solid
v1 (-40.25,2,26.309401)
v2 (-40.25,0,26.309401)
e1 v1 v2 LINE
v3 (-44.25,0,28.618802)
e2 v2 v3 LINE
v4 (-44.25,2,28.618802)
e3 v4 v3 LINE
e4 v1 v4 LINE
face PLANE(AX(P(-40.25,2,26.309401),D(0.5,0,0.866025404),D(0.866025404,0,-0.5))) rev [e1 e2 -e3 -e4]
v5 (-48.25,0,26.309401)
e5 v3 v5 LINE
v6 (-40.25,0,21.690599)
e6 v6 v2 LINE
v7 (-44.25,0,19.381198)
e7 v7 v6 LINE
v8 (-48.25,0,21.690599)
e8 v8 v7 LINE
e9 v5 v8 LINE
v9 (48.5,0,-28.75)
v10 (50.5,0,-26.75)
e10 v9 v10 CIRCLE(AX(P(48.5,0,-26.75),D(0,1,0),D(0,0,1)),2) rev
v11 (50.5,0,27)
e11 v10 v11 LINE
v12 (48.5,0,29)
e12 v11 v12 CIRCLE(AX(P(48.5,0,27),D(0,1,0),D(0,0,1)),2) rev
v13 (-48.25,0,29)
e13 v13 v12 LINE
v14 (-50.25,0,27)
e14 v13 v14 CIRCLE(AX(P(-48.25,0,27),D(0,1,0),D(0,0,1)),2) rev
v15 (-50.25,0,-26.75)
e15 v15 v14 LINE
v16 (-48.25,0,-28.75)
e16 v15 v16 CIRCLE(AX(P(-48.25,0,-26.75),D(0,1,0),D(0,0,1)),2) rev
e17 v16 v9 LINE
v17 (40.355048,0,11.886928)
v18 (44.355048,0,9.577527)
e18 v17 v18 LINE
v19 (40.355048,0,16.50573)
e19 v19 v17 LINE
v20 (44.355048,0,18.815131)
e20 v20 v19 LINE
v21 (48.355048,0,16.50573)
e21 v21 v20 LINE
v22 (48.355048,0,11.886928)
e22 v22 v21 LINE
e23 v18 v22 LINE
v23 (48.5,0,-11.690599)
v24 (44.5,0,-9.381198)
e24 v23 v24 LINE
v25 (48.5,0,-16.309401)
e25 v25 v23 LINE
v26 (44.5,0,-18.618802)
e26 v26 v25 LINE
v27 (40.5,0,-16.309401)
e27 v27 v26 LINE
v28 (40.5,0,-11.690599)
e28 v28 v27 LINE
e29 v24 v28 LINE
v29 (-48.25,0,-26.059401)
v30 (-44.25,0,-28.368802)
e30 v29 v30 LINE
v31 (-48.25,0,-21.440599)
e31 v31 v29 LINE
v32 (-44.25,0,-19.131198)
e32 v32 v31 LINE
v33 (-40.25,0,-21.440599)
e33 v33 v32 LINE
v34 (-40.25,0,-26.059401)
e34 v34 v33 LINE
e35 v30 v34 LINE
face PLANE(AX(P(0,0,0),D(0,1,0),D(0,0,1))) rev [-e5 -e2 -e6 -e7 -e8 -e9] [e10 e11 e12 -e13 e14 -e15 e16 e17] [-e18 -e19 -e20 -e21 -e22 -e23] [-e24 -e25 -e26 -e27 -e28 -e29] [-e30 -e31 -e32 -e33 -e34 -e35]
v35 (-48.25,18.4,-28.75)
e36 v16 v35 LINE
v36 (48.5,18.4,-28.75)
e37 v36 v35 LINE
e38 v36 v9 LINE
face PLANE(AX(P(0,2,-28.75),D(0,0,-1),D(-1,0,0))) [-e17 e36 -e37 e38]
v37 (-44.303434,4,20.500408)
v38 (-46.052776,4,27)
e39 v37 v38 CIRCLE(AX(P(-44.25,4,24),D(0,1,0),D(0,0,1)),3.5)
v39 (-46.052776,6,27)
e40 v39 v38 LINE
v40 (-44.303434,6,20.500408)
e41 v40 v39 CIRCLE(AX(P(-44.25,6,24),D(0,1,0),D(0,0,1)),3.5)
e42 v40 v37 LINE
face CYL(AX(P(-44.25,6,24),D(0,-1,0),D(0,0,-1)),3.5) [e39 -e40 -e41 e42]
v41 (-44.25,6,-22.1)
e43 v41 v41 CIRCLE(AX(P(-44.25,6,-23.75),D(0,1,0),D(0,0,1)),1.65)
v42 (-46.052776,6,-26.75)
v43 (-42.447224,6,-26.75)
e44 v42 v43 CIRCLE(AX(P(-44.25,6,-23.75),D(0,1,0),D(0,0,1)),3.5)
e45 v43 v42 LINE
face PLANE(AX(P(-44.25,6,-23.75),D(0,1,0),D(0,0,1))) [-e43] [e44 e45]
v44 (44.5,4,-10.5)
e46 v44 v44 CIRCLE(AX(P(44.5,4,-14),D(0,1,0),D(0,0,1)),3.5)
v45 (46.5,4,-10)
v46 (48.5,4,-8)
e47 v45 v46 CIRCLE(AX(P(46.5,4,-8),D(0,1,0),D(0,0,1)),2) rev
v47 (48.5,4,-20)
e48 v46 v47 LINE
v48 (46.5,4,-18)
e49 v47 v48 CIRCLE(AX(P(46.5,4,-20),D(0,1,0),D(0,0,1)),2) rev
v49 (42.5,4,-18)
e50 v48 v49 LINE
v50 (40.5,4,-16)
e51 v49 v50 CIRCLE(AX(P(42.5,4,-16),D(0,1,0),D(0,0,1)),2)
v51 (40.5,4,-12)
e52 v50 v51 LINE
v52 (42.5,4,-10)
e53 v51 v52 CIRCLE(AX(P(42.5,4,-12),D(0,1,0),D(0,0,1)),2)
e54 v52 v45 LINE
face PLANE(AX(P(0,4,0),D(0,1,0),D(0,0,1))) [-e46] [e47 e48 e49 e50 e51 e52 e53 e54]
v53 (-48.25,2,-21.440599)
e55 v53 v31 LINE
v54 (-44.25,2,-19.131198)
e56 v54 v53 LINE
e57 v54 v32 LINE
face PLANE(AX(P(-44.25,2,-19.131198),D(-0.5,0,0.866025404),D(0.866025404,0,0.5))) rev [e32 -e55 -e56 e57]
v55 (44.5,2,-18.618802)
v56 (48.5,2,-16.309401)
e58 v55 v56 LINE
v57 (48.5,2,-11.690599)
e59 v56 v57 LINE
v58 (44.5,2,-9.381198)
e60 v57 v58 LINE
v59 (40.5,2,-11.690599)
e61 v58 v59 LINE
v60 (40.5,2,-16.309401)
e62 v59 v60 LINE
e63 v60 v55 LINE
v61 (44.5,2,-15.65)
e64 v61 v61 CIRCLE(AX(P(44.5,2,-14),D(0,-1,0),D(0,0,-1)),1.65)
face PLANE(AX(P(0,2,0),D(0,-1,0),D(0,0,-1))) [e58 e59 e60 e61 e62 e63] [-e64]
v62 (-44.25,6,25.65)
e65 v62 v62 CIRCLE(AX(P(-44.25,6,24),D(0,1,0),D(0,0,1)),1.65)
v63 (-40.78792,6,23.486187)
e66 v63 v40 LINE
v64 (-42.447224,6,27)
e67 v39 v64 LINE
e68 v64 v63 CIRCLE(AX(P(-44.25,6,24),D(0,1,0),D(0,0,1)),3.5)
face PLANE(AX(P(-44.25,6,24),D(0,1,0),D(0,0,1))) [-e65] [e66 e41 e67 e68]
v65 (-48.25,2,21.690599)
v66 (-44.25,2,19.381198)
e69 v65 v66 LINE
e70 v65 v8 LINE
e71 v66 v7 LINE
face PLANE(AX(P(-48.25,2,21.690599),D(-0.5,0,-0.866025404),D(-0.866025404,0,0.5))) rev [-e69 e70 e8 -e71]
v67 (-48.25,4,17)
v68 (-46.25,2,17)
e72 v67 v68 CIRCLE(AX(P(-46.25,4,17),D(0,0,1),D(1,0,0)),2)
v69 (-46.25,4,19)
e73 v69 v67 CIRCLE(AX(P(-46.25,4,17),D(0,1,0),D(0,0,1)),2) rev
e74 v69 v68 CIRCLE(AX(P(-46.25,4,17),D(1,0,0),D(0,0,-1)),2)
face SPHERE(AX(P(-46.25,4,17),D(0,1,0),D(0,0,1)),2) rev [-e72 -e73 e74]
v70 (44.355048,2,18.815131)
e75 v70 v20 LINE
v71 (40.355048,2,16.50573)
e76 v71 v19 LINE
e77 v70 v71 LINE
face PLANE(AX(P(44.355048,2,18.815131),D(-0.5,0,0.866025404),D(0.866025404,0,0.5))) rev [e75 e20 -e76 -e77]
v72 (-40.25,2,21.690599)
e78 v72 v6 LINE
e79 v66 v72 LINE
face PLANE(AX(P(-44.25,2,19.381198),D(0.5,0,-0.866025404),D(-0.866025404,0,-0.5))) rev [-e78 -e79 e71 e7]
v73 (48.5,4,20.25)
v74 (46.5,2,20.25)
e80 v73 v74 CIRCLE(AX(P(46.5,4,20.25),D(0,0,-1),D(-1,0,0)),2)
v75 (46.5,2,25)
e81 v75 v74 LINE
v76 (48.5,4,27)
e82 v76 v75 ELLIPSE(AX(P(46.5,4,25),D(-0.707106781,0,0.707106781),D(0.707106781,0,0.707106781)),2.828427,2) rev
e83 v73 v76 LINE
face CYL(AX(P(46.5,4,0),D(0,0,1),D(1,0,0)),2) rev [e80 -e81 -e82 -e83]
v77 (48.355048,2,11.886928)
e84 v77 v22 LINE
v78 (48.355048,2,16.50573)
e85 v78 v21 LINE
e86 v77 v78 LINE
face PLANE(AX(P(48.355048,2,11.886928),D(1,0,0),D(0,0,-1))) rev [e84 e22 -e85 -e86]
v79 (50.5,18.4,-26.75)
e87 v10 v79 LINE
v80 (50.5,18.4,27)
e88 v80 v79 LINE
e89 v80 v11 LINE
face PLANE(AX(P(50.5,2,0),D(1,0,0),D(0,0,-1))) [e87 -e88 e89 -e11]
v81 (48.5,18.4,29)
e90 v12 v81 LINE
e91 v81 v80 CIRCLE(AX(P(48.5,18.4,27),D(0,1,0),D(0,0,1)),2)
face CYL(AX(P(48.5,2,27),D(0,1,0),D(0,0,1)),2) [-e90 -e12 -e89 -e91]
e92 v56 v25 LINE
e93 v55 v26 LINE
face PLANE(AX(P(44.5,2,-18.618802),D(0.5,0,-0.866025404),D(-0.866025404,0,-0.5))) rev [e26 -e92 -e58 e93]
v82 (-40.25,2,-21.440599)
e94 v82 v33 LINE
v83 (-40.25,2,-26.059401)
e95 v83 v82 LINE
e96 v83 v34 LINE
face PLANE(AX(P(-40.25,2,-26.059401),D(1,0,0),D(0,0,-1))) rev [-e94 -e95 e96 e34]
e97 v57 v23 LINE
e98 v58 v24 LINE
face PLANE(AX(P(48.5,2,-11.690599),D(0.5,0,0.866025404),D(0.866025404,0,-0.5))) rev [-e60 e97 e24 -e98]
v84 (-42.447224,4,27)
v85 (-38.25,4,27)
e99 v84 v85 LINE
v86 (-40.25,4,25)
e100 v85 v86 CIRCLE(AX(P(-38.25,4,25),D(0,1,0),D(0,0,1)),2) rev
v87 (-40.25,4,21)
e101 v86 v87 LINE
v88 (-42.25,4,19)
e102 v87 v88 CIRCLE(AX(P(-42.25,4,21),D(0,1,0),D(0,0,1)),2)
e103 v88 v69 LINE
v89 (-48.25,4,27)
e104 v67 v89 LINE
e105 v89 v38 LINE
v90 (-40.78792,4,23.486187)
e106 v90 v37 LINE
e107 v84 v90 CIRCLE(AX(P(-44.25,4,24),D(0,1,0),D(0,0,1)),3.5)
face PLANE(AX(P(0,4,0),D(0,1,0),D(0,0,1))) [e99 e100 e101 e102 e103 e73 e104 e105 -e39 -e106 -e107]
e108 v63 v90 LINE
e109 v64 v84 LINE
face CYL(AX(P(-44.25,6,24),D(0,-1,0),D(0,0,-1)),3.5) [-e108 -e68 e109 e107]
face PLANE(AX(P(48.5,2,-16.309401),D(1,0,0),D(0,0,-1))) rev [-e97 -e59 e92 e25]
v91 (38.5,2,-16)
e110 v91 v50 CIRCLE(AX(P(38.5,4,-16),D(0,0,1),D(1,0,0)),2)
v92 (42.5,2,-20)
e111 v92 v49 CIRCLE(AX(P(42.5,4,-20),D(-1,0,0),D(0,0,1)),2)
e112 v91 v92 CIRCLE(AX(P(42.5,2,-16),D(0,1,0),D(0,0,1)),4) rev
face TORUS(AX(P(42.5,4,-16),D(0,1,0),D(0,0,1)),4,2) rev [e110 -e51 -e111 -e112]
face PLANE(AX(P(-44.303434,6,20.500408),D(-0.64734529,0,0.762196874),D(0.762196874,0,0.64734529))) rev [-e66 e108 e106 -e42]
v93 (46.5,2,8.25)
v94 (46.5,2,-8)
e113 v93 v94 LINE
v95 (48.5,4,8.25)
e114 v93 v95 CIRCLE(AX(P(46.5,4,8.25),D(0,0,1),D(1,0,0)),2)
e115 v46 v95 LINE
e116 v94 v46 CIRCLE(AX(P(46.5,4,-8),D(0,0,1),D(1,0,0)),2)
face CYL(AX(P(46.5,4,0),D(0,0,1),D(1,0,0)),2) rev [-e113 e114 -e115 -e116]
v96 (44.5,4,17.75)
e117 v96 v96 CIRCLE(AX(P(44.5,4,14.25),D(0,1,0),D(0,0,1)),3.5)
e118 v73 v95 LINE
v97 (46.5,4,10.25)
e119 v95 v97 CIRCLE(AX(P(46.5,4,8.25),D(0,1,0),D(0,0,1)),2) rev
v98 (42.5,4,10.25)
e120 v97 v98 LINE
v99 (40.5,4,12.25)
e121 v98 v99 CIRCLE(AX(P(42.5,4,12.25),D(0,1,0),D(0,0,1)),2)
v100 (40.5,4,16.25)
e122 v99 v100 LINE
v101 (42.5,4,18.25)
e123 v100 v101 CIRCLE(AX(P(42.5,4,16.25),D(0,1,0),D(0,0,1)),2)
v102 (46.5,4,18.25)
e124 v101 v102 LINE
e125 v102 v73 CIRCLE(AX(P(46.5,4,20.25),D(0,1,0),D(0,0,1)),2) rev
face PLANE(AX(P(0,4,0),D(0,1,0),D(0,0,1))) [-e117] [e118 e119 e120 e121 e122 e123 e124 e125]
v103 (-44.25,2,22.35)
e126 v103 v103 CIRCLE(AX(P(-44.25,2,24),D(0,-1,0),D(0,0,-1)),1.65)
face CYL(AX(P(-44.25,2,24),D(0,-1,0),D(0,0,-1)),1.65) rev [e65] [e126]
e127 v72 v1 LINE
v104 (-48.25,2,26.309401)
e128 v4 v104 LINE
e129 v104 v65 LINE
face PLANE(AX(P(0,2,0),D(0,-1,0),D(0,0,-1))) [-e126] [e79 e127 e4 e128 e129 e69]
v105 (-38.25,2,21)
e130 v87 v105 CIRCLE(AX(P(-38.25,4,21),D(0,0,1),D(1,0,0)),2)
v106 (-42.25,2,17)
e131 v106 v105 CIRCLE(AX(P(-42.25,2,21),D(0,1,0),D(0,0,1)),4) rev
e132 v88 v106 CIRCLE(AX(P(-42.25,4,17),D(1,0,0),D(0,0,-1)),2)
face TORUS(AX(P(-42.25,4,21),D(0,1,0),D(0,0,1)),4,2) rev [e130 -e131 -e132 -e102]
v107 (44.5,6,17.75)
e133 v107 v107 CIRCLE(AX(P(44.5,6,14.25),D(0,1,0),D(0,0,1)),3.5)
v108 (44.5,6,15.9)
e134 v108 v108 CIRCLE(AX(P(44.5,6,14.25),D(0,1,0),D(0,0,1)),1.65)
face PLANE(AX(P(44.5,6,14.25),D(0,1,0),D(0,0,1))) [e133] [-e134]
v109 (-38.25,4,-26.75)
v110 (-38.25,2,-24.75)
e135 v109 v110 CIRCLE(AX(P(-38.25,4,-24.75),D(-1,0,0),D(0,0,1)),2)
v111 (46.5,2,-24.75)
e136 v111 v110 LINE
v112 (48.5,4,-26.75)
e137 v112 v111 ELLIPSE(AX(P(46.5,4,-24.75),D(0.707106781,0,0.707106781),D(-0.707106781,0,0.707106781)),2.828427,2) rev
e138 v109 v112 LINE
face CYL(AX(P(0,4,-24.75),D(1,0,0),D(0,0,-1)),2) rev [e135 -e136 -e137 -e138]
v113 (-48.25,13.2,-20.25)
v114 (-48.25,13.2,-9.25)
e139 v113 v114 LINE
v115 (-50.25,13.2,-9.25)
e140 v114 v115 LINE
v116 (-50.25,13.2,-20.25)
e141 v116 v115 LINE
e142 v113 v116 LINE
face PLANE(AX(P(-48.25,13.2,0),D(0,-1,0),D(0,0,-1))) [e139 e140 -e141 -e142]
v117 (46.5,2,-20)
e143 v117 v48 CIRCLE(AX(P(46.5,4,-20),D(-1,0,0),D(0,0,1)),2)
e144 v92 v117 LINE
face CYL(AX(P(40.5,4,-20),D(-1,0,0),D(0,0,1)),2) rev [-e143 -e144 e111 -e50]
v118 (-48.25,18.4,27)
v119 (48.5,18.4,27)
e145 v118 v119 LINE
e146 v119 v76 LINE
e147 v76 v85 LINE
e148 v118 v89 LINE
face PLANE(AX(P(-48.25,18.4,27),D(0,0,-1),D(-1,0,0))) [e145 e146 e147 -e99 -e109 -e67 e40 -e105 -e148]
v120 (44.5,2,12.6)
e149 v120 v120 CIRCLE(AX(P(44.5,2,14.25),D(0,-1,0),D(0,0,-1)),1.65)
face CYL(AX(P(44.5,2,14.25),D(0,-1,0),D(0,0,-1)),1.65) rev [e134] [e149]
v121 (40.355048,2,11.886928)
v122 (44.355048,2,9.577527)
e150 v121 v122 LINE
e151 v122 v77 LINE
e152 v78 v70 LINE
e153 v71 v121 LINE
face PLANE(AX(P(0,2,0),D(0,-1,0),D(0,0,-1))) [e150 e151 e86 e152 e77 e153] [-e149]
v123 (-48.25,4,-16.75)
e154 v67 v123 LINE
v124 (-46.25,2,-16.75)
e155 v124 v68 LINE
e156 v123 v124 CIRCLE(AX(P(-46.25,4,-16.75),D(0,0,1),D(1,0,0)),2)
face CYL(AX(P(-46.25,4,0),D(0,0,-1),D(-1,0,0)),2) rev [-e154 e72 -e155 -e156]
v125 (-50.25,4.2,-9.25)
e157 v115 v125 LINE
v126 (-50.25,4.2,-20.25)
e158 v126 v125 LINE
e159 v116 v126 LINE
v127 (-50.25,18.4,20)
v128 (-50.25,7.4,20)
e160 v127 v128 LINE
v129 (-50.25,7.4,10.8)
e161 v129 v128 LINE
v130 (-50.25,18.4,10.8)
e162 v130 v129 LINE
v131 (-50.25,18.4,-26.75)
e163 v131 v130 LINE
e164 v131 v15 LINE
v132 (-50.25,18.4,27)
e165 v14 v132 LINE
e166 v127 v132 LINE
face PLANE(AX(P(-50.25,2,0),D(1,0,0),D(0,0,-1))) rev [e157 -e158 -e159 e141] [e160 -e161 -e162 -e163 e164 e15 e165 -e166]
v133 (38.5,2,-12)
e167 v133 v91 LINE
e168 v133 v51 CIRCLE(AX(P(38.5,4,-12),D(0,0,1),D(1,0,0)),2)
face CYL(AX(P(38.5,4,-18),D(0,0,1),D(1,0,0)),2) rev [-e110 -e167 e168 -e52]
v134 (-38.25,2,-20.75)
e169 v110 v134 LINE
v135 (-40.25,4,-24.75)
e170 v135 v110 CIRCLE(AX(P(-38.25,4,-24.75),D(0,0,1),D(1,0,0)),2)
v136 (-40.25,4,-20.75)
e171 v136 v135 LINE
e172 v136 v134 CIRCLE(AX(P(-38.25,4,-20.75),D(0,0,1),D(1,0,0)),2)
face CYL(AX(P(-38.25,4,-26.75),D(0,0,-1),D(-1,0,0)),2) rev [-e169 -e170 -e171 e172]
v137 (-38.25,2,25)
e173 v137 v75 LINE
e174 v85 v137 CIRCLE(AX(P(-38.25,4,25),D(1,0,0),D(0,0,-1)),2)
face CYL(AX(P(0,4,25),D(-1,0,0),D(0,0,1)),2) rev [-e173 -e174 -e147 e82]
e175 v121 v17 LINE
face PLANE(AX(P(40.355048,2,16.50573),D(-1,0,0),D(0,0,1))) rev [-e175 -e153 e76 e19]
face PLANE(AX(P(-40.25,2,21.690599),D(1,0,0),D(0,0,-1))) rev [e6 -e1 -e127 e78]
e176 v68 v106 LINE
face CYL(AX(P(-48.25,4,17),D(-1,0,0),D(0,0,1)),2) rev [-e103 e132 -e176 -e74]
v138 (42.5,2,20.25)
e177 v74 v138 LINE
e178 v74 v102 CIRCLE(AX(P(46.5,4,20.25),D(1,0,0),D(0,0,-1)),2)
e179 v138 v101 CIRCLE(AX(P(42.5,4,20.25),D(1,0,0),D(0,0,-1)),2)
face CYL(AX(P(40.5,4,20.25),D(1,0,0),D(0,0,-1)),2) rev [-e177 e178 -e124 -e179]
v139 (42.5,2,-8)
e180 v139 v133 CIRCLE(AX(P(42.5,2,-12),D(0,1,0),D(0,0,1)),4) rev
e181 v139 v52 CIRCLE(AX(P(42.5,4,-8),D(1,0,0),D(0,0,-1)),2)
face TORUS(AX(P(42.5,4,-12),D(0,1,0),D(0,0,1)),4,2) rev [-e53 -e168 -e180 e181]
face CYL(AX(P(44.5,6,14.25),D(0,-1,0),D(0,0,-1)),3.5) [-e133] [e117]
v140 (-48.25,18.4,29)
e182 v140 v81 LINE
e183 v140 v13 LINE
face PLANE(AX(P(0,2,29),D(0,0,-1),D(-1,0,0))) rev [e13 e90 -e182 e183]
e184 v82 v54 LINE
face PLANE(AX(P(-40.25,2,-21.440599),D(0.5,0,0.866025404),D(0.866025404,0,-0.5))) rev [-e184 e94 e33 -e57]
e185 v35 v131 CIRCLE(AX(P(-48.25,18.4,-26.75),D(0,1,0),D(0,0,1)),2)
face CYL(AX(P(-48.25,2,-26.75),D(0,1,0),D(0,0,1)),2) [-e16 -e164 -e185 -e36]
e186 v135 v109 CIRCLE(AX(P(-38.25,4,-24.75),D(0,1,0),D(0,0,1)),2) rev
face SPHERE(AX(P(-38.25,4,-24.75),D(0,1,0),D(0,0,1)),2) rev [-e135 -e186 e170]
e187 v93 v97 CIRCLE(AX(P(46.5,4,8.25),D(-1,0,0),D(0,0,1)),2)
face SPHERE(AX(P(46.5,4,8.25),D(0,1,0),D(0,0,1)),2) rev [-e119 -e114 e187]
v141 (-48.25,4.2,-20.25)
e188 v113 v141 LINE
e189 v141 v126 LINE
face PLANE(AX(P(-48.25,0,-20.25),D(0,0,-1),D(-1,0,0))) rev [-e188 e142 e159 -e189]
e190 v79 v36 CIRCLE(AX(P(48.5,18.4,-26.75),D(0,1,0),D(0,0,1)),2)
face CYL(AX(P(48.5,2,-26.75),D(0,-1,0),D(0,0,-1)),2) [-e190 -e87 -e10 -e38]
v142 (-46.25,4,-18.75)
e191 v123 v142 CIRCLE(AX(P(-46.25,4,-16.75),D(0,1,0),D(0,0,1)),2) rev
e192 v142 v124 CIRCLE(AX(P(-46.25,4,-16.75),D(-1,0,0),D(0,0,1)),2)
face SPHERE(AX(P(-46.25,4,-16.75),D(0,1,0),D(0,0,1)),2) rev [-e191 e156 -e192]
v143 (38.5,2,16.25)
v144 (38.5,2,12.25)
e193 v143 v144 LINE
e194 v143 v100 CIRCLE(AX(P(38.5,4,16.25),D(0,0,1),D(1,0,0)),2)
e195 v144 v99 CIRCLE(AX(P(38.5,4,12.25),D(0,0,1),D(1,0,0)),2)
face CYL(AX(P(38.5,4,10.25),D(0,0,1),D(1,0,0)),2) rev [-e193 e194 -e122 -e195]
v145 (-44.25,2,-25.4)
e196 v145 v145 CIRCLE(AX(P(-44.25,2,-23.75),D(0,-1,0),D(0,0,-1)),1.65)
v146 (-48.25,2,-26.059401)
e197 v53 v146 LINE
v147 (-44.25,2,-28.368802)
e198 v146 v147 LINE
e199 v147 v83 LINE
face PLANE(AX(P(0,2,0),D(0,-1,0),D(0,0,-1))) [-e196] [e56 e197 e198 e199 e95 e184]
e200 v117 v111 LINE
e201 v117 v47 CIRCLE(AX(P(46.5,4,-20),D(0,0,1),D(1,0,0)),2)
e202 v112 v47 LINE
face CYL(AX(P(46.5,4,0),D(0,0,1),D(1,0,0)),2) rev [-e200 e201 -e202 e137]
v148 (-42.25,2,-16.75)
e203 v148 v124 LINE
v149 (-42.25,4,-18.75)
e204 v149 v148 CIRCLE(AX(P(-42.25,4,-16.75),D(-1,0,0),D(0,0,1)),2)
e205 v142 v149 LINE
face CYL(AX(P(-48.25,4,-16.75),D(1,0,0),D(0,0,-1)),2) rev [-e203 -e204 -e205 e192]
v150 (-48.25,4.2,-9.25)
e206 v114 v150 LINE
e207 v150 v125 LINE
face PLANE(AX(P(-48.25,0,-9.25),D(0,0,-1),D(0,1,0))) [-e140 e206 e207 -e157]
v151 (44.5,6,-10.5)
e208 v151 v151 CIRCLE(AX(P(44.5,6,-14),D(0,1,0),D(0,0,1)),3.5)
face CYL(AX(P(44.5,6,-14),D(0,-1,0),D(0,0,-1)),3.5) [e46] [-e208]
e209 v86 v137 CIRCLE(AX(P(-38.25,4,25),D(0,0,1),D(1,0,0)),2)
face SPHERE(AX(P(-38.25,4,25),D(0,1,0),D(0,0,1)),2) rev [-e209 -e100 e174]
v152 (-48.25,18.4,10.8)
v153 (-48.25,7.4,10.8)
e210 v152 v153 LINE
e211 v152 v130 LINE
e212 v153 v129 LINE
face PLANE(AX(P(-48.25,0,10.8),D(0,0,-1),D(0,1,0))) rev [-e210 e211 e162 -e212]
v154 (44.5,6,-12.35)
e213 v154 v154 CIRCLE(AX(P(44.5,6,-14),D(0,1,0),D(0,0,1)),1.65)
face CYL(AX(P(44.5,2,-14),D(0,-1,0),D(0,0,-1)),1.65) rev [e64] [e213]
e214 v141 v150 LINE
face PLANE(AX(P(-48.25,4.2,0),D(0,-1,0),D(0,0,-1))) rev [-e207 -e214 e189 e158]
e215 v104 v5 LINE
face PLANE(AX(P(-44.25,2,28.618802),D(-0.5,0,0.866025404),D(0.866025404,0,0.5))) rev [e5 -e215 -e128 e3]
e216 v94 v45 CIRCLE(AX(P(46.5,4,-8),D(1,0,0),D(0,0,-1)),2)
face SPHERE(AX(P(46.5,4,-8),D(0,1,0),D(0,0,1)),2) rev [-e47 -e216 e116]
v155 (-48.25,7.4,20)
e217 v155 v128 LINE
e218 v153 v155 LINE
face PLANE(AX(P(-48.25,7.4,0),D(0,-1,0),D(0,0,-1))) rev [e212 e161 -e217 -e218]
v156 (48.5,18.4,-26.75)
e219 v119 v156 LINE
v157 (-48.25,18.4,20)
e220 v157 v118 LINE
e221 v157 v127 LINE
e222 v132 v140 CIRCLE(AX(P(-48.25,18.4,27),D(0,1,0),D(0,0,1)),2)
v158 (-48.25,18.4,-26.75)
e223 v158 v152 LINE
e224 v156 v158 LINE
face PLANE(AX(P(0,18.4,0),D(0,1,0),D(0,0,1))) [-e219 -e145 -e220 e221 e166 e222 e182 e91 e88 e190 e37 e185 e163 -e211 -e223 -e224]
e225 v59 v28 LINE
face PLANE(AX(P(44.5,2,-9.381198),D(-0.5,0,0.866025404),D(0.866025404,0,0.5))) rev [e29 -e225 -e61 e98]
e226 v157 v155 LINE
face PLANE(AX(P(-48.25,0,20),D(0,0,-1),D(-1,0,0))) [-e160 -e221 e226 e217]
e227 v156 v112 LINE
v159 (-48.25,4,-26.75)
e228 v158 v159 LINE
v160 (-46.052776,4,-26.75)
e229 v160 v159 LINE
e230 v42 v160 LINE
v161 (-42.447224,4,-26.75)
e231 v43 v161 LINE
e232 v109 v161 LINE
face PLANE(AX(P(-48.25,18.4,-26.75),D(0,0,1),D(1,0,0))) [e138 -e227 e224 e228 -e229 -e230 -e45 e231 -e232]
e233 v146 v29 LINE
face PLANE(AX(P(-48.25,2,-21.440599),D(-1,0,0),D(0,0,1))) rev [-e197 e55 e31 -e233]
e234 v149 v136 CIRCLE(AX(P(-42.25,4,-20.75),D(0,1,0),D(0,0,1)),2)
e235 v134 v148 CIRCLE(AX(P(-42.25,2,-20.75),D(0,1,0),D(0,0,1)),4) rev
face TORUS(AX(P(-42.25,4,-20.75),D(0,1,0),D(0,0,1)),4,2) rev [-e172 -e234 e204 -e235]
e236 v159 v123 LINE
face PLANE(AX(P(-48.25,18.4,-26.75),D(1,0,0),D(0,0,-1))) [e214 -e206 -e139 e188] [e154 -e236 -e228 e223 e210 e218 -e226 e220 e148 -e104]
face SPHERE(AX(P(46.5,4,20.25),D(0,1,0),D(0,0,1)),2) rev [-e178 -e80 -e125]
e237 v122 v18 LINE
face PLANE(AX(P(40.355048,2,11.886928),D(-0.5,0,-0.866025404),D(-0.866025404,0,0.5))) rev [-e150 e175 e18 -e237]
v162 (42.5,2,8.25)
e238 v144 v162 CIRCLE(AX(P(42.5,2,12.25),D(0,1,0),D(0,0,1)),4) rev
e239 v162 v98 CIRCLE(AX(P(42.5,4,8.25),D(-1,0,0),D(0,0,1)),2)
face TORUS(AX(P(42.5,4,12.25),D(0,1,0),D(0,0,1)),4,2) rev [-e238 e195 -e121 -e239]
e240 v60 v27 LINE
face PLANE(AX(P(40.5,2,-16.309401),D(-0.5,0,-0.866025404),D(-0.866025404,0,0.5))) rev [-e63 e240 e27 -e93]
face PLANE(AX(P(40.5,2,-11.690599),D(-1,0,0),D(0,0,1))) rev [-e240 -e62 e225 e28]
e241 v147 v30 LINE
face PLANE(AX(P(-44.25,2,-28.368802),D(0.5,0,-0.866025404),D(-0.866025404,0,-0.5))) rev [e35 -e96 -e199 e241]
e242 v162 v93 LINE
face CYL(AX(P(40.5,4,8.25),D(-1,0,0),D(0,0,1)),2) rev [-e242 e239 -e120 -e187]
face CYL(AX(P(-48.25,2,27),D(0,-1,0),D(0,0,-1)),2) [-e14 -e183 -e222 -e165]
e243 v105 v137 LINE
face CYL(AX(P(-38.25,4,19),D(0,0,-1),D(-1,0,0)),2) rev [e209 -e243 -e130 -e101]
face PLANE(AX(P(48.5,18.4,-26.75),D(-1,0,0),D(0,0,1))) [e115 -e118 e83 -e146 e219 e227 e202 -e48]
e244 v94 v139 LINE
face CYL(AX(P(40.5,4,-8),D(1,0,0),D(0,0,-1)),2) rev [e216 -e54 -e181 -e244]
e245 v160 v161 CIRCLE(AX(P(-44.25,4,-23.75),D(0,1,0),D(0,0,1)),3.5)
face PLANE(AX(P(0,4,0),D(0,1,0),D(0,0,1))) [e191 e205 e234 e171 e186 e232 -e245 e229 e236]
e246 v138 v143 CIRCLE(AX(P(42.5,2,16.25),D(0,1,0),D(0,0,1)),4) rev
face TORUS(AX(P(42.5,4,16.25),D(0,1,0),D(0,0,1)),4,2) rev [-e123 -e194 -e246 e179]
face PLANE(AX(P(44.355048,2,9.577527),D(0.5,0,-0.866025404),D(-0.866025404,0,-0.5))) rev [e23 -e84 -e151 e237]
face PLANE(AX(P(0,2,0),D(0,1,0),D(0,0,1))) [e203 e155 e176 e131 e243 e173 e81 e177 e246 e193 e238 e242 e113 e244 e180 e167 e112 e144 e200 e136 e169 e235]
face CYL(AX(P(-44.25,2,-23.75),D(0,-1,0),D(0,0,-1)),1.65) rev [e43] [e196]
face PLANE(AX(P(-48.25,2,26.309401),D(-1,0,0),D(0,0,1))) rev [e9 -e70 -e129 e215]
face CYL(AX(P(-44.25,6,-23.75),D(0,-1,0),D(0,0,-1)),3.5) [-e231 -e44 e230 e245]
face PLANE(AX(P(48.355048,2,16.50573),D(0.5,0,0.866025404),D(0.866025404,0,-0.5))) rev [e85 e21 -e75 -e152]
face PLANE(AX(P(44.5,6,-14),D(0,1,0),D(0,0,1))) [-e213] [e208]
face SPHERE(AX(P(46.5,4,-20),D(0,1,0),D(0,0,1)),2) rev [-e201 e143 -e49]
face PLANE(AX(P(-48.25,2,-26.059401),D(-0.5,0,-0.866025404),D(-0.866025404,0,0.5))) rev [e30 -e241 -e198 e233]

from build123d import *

# Parameters (mm, degrees)
SKETCH1_W           = 100.75
SKETCH1_H           = 57.75
SKETCH1_W_2         = 96.75
SKETCH1_H_2         = 53.75
SKETCH1_R           = 1.65
BOSS_EXTRUDE1_DEPTH = 2
SKETCH2_R           = 3.5
SKETCH2_R_2         = 1.65
BOSS_EXTRUDE2_DEPTH = 4
SKETCH3_W           = 100.75
SKETCH3_H           = 57.75
SKETCH3_W_2         = 96.75
SKETCH3_H_2         = 53.75
BOSS_EXTRUDE3_DEPTH = 16.4
FILLET1_R           = 2
SKETCH5_W           = 8
SKETCH5_H           = 8
SKETCH5_R           = 1.65
BOSS_EXTRUDE4_DEPTH = 2
FILLET3_R           = 2
FILLET4_R           = 2
SKETCH6_W           = 9.2
SKETCH6_H           = 11
SKETCH6_W_2         = 8
SKETCH6_H_2         = 2.6
CUT_EXTRUDE2_DEPTH  = 2
CUT_EXTRUDE3_DEPTH  = 2


with BuildPart() as part:
    # Sketch1 → Boss-Extrude1 (new body)
    # profile 1 of 2: a face of its own
    with BuildSketch(Plane(origin=(0, 0, 0), x_dir=(1, 0, 0), z_dir=(0, 1, 0))):
        with Locations((0.125, -0.125)):
            Rectangle(SKETCH1_W, SKETCH1_H)
        with Locations((0.125, -0.125)):
            Rectangle(SKETCH1_W_2, SKETCH1_H_2, mode=Mode.SUBTRACT)
    # profile 2 of 2: a face of its own
    with BuildSketch(Plane(origin=(0, 0, 0), x_dir=(1, 0, 0), z_dir=(0, 1, 0))):
        with Locations((0.125, -0.125)):
            Rectangle(SKETCH1_W_2, SKETCH1_H_2)
        with Locations(Location((-44.25, -24, 0), (0, 0, 270))):
            Circle(SKETCH1_R, mode=Mode.SUBTRACT)
        with Locations(Location((-44.25, 23.75, 0), (0, 0, 270))):
            Circle(SKETCH1_R, mode=Mode.SUBTRACT)
        with Locations(Location((44.5, 14, 0), (0, 0, 270))):
            Circle(SKETCH1_R, mode=Mode.SUBTRACT)
        with Locations(Location((44.5, -14.25, 0), (0, 0, 270))):
            Circle(SKETCH1_R, mode=Mode.SUBTRACT)
    extrude(amount=BOSS_EXTRUDE1_DEPTH)

    # Sketch2 → Boss-Extrude2 (add)
    # profile 1 of 4: a face of its own
    with BuildSketch(Plane(origin=(0, 2, 0), x_dir=(1, 0, 0), z_dir=(0, 1, 0))):
        with Locations(Location((44.5, 14, 0), (0, 0, 270))):
            Circle(SKETCH2_R)
        with Locations(Location((44.5, 14, 0), (0, 0, 270))):
            Circle(SKETCH2_R_2, mode=Mode.SUBTRACT)
    # profile 2 of 4: a face of its own
    with BuildSketch(Plane(origin=(0, 2, 0), x_dir=(1, 0, 0), z_dir=(0, 1, 0))):
        with Locations(Location((44.5, -14.25, 0), (0, 0, 270))):
            Circle(SKETCH2_R)
        with Locations(Location((44.5, -14.25, 0), (0, 0, 270))):
            Circle(SKETCH2_R_2, mode=Mode.SUBTRACT)
    # profile 3 of 4: a face of its own
    with BuildSketch(Plane(origin=(0, 2, 0), x_dir=(1, 0, 0), z_dir=(0, 1, 0))):
        with BuildLine():
            Line((-44.303434376, -20.500407914), (-40.787920243, -23.486187041))
            ThreePointArc((-40.787920243, -23.486187041), (-41.085130973, -25.494524687), (-42.447224362, -27))
            Line((-42.447224362, -27), (-46.052775638, -27))
            ThreePointArc((-46.052775638, -27), (-47.629726797, -23.090358985), (-44.303434376, -20.500407914))
        make_face()
        with Locations(Location((-44.25, -24, 0), (0, 0, 270))):
            Circle(SKETCH2_R_2, mode=Mode.SUBTRACT)
    # profile 4 of 4: a face of its own
    with BuildSketch(Plane(origin=(0, 2, 0), x_dir=(1, 0, 0), z_dir=(0, 1, 0))):
        with BuildLine():
            Line((-46.052775638, 26.75), (-42.447224362, 26.75))
            ThreePointArc((-42.447224362, 26.75), (-44.25, 20.25), (-46.052775638, 26.75))
        make_face()
        with Locations(Location((-44.25, 23.75, 0), (0, 0, 270))):
            Circle(SKETCH2_R_2, mode=Mode.SUBTRACT)
    extrude(amount=BOSS_EXTRUDE2_DEPTH)

    # Sketch3 → Boss-Extrude3 (add)
    with BuildSketch(Plane(origin=(0, 2, 0), x_dir=(1, 0, 0), z_dir=(0, 1, 0))):
        with Locations((0.125, -0.125)):
            Rectangle(SKETCH3_W, SKETCH3_H)
        with Locations((0.125, -0.125)):
            Rectangle(SKETCH3_W_2, SKETCH3_H_2, mode=Mode.SUBTRACT)
    extrude(amount=BOSS_EXTRUDE3_DEPTH)

    # Fillet1
    fillet1_edges = [part.edges().sort_by_distance(p)[0] for p in [
        (50.5, 9.2, 29),
        (-50.25, 9.2, 29),
        (-50.25, 9.2, -28.75),
        (50.5, 9.2, -28.75),
    ]]
    fillet(fillet1_edges, radius=FILLET1_R)

    # Sketch5 → Boss-Extrude4 (add)
    # profile 1 of 4: a face of its own
    with BuildSketch(Plane(origin=(0, 2, 0), x_dir=(1, 0, 0), z_dir=(0, 1, 0))):
        with Locations((44.5, 14)):
            Rectangle(SKETCH5_W, SKETCH5_H)
        with Locations(Location((44.5, 14, 0), (0, 0, 270))):
            Circle(SKETCH5_R, mode=Mode.SUBTRACT)
    # profile 2 of 4: a face of its own
    with BuildSketch(Plane(origin=(0, 2, 0), x_dir=(1, 0, 0), z_dir=(0, 1, 0))):
        with Locations((44.5, -14.25)):
            Rectangle(SKETCH5_W, SKETCH5_H)
        with Locations(Location((44.5, -14.25, 0), (0, 0, 270))):
            Circle(SKETCH5_R, mode=Mode.SUBTRACT)
    # profile 3 of 4: a face of its own
    with BuildSketch(Plane(origin=(0, 2, 0), x_dir=(1, 0, 0), z_dir=(0, 1, 0))):
        with Locations((-44.25, -23)):
            Rectangle(SKETCH5_W, SKETCH5_H)
        with Locations(Location((-44.25, -24, 0), (0, 0, 270))):
            Circle(SKETCH5_R, mode=Mode.SUBTRACT)
    # profile 4 of 4: a face of its own
    with BuildSketch(Plane(origin=(0, 2, 0), x_dir=(1, 0, 0), z_dir=(0, 1, 0))):
        with Locations((-44.25, 22.75)):
            Rectangle(SKETCH5_W, SKETCH5_H)
        with Locations(Location((-44.25, 23.75, 0), (0, 0, 270))):
            Circle(SKETCH5_R, mode=Mode.SUBTRACT)
    extrude(amount=BOSS_EXTRUDE4_DEPTH)

    # Fillet3
    fillet3_edges = [part.edges().sort_by_distance(p)[0] for p in [
        (40.5, 3, -18),
        (40.5, 3, -10),
        (48.5, 3, -10),
        (48.5, 3, -18),
        (40.5, 3, 10.25),
        (40.5, 3, 18.25),
        (48.5, 3, 18.25),
        (48.5, 3, 10.25),
        (-48.25, 3, 19),
        (-40.25, 3, 27),
        (-40.25, 3, 19),
        (-40.25, 3, -26.75),
        (-48.25, 3, -18.75),
        (-40.25, 3, -18.75),
    ]]
    fillet(fillet3_edges, radius=FILLET3_R)

    # Fillet4
    fillet4_edges = [part.edges().sort_by_distance(p)[0] for p in [
        (48.5, 2, -23.375),
        (47.914213562, 2, -18.585786438),
        (44.5, 2, -18),
        (41.085786438, 2, -17.414213562),
        (48.5, 2, 23.625),
        (47.914213562, 2, 18.835786438),
        (44.5, 2, 18.25),
        (41.085786438, 2, 17.664213562),
        (40.5, 2, 14.25),
        (41.085786438, 2, 10.835786438),
        (44.5, 2, 10.25),
        (47.914213562, 2, 9.664213562),
        (48.5, 2, 0.125),
        (47.914213562, 2, -9.414213562),
        (44.5, 2, -10),
        (41.085786438, 2, -10.585786438),
        (5.125, 2, 27),
        (-39.664213562, 2, 26.414213562),
        (-40.25, 2, 23),
        (-40.835786438, 2, 19.585786438),
        (5.125, 2, -26.75),
        (-39.664213562, 2, -26.164213562),
        (-40.25, 2, -22.75),
        (-40.835786438, 2, -19.335786438),
        (-44.25, 2, -18.75),
        (-47.664213562, 2, -18.164213562),
        (-48.25, 2, 0.125),
        (-47.664213562, 2, 18.414213562),
        (40.5, 2, -14),
        (-44.25, 2, 19),
    ]]
    fillet(fillet4_edges, radius=FILLET4_R - 0.0001)  # a hair under: the kernel refuses the full size

    # Sketch6 → Cut-Extrude2 (cut)
    with BuildSketch(Plane.ZY.offset(50.25)):
        with Locations((15.4, 12.9)):
            Rectangle(SKETCH6_W, SKETCH6_H)
        Polygon((-18.75, 7.4), (-20.25, 7.4), (-20.25, 4.2), (-9.25, 4.2), (-9.25, 7.4), (-10.75, 7.4), align=None)
        Polygon((-20.25, 13.2), (-20.25, 7.4), (-18.75, 7.4), (-18.75, 10), (-10.75, 10), (-10.75, 7.4), (-9.25, 7.4), (-9.25, 13.2), align=None)
        with Locations((-14.75, 8.7)):
            Rectangle(SKETCH6_W_2, SKETCH6_H_2)
    extrude(amount=-CUT_EXTRUDE2_DEPTH, mode=Mode.SUBTRACT)

    # Sketch4 → Cut-Extrude3 (cut)
    with BuildSketch(Plane.XZ):
        Polygon((40.5, -11.690598923), (40.5, -16.309401077), (44.5, -18.618802154), (48.5, -16.309401077), (48.5, -11.690598923), (44.5, -9.381197846), align=None)
        Polygon((40.355047504, 11.886928072), (44.355047504, 9.577526995), (48.355047504, 11.886928072), (48.355047504, 16.505730226), (44.355047504, 18.815131302), (40.355047504, 16.505730226), align=None)
        Polygon((-48.25, 26.309401077), (-48.25, 21.690598923), (-44.25, 19.381197846), (-40.25, 21.690598923), (-40.25, 26.309401077), (-44.25, 28.618802154), align=None)
        Polygon((-44.25, -19.131197846), (-48.25, -21.440598923), (-48.25, -26.059401077), (-44.25, -28.368802154), (-40.25, -26.059401077), (-40.25, -21.440598923), align=None)
    extrude(amount=-CUT_EXTRUDE3_DEPTH, mode=Mode.SUBTRACT)


solid = part.part
